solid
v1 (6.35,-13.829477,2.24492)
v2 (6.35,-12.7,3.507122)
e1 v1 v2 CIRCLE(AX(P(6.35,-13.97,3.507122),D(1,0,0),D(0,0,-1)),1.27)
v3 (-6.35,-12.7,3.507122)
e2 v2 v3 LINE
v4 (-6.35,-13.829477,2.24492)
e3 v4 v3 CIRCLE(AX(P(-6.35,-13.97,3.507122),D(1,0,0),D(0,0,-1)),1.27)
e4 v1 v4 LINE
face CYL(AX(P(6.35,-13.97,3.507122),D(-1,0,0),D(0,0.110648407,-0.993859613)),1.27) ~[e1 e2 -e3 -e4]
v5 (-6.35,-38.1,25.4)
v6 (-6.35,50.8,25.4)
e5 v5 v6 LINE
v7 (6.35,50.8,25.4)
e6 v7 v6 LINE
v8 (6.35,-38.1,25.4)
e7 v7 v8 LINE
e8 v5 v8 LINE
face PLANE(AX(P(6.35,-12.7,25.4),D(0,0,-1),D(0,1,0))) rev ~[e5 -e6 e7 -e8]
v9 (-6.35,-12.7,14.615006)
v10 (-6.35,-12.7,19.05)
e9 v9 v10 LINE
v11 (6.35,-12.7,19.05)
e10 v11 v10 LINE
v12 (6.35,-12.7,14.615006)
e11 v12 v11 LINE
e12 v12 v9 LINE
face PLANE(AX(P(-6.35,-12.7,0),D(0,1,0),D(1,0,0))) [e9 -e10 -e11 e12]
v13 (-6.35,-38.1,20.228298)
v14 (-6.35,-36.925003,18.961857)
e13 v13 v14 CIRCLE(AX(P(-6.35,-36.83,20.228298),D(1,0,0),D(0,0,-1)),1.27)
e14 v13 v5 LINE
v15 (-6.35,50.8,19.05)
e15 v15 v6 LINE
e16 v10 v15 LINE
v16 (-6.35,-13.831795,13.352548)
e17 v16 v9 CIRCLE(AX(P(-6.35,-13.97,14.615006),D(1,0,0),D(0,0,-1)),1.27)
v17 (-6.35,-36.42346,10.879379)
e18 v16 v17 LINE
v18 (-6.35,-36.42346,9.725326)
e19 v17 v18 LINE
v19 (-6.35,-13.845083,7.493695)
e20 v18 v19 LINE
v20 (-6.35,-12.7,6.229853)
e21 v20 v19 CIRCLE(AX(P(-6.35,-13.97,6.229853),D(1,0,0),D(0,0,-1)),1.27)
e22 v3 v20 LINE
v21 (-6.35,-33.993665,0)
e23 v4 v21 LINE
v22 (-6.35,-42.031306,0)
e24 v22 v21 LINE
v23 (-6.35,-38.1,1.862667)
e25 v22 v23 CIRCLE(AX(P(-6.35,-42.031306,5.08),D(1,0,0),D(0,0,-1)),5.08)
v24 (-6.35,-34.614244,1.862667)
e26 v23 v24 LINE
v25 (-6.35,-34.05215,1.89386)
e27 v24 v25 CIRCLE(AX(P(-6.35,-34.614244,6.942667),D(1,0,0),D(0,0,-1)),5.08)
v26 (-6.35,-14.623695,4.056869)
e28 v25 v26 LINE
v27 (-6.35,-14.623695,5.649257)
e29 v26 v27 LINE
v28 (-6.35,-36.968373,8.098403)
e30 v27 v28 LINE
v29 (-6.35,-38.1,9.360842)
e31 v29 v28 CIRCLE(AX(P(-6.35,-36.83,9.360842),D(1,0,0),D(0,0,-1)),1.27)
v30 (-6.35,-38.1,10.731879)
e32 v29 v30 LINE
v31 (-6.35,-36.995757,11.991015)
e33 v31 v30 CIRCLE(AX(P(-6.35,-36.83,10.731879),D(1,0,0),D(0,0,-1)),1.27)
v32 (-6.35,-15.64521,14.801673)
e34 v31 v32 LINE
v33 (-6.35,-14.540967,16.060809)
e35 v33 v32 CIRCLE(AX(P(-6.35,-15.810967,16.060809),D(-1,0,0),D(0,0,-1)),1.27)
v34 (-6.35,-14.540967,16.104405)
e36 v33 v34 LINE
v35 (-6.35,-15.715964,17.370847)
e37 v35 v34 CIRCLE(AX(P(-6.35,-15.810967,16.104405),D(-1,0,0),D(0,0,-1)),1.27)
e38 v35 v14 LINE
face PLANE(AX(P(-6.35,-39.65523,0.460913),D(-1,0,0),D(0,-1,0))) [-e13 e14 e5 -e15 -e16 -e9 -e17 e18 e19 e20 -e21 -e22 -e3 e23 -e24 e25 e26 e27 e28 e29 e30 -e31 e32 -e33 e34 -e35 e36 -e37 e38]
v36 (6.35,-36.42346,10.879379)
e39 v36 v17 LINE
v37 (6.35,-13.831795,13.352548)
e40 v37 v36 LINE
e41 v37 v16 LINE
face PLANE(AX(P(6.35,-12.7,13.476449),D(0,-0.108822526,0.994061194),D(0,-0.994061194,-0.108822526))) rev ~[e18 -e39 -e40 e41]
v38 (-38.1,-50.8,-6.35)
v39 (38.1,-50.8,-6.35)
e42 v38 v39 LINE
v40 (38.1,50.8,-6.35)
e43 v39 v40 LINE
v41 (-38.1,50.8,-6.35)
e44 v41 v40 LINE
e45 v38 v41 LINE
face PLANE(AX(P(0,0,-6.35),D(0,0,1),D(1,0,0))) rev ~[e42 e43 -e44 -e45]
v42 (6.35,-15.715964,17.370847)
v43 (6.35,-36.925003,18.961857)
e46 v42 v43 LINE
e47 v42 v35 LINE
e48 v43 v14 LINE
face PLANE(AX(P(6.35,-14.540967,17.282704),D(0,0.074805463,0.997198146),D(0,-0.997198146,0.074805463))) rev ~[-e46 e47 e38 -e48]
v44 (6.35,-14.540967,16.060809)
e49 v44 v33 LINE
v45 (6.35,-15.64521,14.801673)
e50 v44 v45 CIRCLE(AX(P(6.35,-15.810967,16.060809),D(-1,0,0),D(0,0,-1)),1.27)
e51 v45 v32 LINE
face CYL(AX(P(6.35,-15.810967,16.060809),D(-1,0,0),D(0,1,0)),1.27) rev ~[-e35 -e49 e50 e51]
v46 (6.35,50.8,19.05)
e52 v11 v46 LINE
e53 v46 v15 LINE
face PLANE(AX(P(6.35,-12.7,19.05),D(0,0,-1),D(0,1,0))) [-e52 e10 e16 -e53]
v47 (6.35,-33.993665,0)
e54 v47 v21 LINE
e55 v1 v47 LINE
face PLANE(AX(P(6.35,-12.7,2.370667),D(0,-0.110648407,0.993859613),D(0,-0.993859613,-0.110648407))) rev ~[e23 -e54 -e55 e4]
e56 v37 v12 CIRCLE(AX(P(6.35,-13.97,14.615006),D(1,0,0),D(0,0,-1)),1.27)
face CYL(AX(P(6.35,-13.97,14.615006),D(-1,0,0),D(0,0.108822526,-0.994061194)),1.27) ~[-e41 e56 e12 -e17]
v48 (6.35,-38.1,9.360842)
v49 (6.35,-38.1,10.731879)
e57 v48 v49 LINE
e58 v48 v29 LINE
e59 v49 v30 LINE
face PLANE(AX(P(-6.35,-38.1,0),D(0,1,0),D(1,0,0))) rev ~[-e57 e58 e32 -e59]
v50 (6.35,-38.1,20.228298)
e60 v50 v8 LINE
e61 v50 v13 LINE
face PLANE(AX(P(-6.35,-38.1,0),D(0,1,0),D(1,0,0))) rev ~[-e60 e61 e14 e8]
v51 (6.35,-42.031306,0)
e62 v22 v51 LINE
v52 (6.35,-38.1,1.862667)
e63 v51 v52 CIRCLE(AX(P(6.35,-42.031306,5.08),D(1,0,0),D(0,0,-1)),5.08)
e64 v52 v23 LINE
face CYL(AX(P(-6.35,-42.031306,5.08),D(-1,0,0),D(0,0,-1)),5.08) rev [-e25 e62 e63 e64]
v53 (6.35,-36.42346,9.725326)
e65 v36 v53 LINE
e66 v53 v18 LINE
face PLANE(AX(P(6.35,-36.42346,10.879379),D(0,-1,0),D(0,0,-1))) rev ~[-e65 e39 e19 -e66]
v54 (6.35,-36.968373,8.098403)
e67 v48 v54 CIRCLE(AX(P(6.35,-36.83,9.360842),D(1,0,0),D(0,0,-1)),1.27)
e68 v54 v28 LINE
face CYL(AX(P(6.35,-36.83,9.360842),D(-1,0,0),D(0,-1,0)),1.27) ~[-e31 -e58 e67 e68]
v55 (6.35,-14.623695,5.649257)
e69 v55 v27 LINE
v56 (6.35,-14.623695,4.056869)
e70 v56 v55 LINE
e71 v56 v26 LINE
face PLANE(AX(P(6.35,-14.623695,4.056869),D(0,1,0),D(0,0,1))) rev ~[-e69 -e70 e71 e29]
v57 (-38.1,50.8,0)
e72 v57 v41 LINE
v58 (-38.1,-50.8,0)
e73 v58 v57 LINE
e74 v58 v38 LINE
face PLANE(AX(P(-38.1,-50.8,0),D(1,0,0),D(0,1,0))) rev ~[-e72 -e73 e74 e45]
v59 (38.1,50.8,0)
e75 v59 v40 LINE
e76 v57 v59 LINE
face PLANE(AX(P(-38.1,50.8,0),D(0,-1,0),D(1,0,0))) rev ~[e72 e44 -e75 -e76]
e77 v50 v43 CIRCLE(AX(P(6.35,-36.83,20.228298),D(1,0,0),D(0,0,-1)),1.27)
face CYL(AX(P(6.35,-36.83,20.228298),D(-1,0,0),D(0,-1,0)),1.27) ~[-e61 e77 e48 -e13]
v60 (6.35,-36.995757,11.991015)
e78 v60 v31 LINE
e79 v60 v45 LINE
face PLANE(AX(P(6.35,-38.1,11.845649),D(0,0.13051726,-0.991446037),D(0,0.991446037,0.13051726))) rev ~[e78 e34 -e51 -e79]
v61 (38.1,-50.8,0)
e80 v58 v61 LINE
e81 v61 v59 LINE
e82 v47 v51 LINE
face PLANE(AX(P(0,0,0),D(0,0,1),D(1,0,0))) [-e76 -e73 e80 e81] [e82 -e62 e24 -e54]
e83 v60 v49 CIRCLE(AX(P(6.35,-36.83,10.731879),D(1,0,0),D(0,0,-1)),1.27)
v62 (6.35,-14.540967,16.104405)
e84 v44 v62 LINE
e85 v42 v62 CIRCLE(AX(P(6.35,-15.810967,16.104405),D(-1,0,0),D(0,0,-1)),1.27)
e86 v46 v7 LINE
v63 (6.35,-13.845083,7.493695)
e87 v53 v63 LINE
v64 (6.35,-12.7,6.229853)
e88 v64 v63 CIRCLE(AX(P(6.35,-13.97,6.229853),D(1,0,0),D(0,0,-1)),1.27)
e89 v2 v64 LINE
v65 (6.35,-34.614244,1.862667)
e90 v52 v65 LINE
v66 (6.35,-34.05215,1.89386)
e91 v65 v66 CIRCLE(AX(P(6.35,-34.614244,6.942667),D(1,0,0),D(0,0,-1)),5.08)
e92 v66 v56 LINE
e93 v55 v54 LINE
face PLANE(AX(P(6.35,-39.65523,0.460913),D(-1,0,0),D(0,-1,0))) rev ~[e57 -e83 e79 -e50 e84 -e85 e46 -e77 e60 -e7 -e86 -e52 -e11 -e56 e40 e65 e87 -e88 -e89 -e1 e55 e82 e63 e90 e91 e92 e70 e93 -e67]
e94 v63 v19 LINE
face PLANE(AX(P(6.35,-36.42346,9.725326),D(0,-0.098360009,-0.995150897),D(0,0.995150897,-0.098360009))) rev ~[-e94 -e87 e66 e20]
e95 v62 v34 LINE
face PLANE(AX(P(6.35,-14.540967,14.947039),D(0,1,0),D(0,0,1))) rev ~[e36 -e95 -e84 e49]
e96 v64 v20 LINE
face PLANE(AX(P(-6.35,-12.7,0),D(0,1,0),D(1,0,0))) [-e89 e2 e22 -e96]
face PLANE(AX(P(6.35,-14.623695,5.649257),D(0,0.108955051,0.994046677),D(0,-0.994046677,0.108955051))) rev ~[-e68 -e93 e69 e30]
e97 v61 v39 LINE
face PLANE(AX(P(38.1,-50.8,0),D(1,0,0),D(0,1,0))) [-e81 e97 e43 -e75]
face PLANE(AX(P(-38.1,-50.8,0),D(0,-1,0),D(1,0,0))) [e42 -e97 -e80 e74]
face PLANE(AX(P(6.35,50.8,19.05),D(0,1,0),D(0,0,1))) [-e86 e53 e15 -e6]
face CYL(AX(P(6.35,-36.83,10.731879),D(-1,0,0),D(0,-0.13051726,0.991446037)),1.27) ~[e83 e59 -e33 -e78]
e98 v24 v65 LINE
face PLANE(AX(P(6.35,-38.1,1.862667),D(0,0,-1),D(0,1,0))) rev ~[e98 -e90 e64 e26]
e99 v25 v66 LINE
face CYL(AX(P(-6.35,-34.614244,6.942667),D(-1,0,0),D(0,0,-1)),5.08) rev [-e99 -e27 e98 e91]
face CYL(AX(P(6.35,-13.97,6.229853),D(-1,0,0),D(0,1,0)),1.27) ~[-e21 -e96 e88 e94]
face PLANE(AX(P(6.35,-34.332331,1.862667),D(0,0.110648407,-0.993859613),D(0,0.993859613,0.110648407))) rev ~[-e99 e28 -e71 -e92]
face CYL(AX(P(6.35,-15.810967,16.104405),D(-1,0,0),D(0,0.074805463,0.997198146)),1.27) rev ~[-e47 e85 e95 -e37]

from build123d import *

# Parameters (mm, degrees)
F0_W        = 76.2
F0_H        = 101.6
F1_DEPTH    = 6.35
F2_W        = 12.7
F2_H        = 25.4
F3_DEPTH    = 25.4
F4_W        = 63.5
F4_H        = 6.35
F5_DEPTH    = 12.7
F7_DEPTH    = 12.7
F8_T1_DEPTH = 12.7
F9_R        = 1.27


# Not quite as in the source:
# - a fillet or chamfer that OpenCascade refuses, or shapes differently, is made with other operations: its cross-section is extruded or revolved along the edge and cut away or added


with BuildPart() as f1:
    # F0 (on Top) → F1 (new body)
    with BuildSketch(Plane.XY):
        Rectangle(F0_W, F0_H)
    extrude(amount=-F1_DEPTH)

    # F2 (on face) → F3 (join)
    with BuildSketch(Plane.XY):
        with Locations((0, -25.4)):
            Rectangle(F2_W, F2_H)
    extrude(amount=F3_DEPTH)

    # F4 (on face) → F5 (join, through all)
    with BuildSketch(Plane.YZ.offset(6.35)):
        with Locations((19.05, 22.225)):
            Rectangle(F4_W, F4_H)
    extrude(amount=-F5_DEPTH)

    # F6 (on face) → F7 (cut, through all)
    with BuildSketch(Plane.YZ.offset(6.35)):
        Polygon((-12.7, 2.3706669454), (-33.9936651289, 0), (-12.7, 0), align=None)
        Polygon((-38.1, 1.8626668025), (-34.33233127, 1.8626668025), (-14.6236953676, 4.0568692279), (-14.6236953676, 5.64925652), (-38.1, 8.2224374637), align=None)
        Polygon((-36.4234596491, 9.7253257409), (-12.7, 7.3805158027), (-12.7, 13.4764490649), (-36.4234596491, 10.8793787658), align=None)
        Polygon((-38.1, 19.05), (-38.1, 11.84564922), (-14.5409666002, 14.9470388849), (-14.5409666002, 17.2827038914), align=None)
    extrude(amount=-F7_DEPTH, mode=Mode.SUBTRACT)

    # F8: fillet of radius 5.08 on 2 edges, made by hand

    # F8_s2 → F8_t1 (join)
    with BuildSketch(Plane.YZ.offset(-6.35)):
        with BuildLine():
            ThreePointArc((-42.0313060293, 0), (-39.8561799, 0.4892237779), (-38.1, 1.8626668025))
            Line((-38.1, 1.8626668025), (-38.1, 0))
            Line((-38.1, 0), (-42.0313060293, 0))
        make_face()
        with BuildLine():
            ThreePointArc((-34.6142437504, 1.8626668025), (-34.3327643656, 1.870471089), (-34.0521498413, 1.8938599694))
            Line((-34.0521498413, 1.8938599694), (-34.33233127, 1.8626668025))
            Line((-34.33233127, 1.8626668025), (-34.6142437504, 1.8626668025))
        make_face()
    extrude(amount=F8_T1_DEPTH)

    # F9
    f9_edges = [f1.edges().sort_by_distance(p)[0] for p in [
        (0, -12.7, 7.380516),
        (0, -12.7, 2.370667),
        (0, -38.1, 11.845649),
        (0, -38.1, 8.222437),
        (0, -12.7, 13.476449),
        (0, -38.1, 19.05),
        (0, -14.540967, 17.282704),
        (0, -14.540967, 14.947039),
    ]]
    fillet(f9_edges, radius=F9_R)


solid = f1.part
